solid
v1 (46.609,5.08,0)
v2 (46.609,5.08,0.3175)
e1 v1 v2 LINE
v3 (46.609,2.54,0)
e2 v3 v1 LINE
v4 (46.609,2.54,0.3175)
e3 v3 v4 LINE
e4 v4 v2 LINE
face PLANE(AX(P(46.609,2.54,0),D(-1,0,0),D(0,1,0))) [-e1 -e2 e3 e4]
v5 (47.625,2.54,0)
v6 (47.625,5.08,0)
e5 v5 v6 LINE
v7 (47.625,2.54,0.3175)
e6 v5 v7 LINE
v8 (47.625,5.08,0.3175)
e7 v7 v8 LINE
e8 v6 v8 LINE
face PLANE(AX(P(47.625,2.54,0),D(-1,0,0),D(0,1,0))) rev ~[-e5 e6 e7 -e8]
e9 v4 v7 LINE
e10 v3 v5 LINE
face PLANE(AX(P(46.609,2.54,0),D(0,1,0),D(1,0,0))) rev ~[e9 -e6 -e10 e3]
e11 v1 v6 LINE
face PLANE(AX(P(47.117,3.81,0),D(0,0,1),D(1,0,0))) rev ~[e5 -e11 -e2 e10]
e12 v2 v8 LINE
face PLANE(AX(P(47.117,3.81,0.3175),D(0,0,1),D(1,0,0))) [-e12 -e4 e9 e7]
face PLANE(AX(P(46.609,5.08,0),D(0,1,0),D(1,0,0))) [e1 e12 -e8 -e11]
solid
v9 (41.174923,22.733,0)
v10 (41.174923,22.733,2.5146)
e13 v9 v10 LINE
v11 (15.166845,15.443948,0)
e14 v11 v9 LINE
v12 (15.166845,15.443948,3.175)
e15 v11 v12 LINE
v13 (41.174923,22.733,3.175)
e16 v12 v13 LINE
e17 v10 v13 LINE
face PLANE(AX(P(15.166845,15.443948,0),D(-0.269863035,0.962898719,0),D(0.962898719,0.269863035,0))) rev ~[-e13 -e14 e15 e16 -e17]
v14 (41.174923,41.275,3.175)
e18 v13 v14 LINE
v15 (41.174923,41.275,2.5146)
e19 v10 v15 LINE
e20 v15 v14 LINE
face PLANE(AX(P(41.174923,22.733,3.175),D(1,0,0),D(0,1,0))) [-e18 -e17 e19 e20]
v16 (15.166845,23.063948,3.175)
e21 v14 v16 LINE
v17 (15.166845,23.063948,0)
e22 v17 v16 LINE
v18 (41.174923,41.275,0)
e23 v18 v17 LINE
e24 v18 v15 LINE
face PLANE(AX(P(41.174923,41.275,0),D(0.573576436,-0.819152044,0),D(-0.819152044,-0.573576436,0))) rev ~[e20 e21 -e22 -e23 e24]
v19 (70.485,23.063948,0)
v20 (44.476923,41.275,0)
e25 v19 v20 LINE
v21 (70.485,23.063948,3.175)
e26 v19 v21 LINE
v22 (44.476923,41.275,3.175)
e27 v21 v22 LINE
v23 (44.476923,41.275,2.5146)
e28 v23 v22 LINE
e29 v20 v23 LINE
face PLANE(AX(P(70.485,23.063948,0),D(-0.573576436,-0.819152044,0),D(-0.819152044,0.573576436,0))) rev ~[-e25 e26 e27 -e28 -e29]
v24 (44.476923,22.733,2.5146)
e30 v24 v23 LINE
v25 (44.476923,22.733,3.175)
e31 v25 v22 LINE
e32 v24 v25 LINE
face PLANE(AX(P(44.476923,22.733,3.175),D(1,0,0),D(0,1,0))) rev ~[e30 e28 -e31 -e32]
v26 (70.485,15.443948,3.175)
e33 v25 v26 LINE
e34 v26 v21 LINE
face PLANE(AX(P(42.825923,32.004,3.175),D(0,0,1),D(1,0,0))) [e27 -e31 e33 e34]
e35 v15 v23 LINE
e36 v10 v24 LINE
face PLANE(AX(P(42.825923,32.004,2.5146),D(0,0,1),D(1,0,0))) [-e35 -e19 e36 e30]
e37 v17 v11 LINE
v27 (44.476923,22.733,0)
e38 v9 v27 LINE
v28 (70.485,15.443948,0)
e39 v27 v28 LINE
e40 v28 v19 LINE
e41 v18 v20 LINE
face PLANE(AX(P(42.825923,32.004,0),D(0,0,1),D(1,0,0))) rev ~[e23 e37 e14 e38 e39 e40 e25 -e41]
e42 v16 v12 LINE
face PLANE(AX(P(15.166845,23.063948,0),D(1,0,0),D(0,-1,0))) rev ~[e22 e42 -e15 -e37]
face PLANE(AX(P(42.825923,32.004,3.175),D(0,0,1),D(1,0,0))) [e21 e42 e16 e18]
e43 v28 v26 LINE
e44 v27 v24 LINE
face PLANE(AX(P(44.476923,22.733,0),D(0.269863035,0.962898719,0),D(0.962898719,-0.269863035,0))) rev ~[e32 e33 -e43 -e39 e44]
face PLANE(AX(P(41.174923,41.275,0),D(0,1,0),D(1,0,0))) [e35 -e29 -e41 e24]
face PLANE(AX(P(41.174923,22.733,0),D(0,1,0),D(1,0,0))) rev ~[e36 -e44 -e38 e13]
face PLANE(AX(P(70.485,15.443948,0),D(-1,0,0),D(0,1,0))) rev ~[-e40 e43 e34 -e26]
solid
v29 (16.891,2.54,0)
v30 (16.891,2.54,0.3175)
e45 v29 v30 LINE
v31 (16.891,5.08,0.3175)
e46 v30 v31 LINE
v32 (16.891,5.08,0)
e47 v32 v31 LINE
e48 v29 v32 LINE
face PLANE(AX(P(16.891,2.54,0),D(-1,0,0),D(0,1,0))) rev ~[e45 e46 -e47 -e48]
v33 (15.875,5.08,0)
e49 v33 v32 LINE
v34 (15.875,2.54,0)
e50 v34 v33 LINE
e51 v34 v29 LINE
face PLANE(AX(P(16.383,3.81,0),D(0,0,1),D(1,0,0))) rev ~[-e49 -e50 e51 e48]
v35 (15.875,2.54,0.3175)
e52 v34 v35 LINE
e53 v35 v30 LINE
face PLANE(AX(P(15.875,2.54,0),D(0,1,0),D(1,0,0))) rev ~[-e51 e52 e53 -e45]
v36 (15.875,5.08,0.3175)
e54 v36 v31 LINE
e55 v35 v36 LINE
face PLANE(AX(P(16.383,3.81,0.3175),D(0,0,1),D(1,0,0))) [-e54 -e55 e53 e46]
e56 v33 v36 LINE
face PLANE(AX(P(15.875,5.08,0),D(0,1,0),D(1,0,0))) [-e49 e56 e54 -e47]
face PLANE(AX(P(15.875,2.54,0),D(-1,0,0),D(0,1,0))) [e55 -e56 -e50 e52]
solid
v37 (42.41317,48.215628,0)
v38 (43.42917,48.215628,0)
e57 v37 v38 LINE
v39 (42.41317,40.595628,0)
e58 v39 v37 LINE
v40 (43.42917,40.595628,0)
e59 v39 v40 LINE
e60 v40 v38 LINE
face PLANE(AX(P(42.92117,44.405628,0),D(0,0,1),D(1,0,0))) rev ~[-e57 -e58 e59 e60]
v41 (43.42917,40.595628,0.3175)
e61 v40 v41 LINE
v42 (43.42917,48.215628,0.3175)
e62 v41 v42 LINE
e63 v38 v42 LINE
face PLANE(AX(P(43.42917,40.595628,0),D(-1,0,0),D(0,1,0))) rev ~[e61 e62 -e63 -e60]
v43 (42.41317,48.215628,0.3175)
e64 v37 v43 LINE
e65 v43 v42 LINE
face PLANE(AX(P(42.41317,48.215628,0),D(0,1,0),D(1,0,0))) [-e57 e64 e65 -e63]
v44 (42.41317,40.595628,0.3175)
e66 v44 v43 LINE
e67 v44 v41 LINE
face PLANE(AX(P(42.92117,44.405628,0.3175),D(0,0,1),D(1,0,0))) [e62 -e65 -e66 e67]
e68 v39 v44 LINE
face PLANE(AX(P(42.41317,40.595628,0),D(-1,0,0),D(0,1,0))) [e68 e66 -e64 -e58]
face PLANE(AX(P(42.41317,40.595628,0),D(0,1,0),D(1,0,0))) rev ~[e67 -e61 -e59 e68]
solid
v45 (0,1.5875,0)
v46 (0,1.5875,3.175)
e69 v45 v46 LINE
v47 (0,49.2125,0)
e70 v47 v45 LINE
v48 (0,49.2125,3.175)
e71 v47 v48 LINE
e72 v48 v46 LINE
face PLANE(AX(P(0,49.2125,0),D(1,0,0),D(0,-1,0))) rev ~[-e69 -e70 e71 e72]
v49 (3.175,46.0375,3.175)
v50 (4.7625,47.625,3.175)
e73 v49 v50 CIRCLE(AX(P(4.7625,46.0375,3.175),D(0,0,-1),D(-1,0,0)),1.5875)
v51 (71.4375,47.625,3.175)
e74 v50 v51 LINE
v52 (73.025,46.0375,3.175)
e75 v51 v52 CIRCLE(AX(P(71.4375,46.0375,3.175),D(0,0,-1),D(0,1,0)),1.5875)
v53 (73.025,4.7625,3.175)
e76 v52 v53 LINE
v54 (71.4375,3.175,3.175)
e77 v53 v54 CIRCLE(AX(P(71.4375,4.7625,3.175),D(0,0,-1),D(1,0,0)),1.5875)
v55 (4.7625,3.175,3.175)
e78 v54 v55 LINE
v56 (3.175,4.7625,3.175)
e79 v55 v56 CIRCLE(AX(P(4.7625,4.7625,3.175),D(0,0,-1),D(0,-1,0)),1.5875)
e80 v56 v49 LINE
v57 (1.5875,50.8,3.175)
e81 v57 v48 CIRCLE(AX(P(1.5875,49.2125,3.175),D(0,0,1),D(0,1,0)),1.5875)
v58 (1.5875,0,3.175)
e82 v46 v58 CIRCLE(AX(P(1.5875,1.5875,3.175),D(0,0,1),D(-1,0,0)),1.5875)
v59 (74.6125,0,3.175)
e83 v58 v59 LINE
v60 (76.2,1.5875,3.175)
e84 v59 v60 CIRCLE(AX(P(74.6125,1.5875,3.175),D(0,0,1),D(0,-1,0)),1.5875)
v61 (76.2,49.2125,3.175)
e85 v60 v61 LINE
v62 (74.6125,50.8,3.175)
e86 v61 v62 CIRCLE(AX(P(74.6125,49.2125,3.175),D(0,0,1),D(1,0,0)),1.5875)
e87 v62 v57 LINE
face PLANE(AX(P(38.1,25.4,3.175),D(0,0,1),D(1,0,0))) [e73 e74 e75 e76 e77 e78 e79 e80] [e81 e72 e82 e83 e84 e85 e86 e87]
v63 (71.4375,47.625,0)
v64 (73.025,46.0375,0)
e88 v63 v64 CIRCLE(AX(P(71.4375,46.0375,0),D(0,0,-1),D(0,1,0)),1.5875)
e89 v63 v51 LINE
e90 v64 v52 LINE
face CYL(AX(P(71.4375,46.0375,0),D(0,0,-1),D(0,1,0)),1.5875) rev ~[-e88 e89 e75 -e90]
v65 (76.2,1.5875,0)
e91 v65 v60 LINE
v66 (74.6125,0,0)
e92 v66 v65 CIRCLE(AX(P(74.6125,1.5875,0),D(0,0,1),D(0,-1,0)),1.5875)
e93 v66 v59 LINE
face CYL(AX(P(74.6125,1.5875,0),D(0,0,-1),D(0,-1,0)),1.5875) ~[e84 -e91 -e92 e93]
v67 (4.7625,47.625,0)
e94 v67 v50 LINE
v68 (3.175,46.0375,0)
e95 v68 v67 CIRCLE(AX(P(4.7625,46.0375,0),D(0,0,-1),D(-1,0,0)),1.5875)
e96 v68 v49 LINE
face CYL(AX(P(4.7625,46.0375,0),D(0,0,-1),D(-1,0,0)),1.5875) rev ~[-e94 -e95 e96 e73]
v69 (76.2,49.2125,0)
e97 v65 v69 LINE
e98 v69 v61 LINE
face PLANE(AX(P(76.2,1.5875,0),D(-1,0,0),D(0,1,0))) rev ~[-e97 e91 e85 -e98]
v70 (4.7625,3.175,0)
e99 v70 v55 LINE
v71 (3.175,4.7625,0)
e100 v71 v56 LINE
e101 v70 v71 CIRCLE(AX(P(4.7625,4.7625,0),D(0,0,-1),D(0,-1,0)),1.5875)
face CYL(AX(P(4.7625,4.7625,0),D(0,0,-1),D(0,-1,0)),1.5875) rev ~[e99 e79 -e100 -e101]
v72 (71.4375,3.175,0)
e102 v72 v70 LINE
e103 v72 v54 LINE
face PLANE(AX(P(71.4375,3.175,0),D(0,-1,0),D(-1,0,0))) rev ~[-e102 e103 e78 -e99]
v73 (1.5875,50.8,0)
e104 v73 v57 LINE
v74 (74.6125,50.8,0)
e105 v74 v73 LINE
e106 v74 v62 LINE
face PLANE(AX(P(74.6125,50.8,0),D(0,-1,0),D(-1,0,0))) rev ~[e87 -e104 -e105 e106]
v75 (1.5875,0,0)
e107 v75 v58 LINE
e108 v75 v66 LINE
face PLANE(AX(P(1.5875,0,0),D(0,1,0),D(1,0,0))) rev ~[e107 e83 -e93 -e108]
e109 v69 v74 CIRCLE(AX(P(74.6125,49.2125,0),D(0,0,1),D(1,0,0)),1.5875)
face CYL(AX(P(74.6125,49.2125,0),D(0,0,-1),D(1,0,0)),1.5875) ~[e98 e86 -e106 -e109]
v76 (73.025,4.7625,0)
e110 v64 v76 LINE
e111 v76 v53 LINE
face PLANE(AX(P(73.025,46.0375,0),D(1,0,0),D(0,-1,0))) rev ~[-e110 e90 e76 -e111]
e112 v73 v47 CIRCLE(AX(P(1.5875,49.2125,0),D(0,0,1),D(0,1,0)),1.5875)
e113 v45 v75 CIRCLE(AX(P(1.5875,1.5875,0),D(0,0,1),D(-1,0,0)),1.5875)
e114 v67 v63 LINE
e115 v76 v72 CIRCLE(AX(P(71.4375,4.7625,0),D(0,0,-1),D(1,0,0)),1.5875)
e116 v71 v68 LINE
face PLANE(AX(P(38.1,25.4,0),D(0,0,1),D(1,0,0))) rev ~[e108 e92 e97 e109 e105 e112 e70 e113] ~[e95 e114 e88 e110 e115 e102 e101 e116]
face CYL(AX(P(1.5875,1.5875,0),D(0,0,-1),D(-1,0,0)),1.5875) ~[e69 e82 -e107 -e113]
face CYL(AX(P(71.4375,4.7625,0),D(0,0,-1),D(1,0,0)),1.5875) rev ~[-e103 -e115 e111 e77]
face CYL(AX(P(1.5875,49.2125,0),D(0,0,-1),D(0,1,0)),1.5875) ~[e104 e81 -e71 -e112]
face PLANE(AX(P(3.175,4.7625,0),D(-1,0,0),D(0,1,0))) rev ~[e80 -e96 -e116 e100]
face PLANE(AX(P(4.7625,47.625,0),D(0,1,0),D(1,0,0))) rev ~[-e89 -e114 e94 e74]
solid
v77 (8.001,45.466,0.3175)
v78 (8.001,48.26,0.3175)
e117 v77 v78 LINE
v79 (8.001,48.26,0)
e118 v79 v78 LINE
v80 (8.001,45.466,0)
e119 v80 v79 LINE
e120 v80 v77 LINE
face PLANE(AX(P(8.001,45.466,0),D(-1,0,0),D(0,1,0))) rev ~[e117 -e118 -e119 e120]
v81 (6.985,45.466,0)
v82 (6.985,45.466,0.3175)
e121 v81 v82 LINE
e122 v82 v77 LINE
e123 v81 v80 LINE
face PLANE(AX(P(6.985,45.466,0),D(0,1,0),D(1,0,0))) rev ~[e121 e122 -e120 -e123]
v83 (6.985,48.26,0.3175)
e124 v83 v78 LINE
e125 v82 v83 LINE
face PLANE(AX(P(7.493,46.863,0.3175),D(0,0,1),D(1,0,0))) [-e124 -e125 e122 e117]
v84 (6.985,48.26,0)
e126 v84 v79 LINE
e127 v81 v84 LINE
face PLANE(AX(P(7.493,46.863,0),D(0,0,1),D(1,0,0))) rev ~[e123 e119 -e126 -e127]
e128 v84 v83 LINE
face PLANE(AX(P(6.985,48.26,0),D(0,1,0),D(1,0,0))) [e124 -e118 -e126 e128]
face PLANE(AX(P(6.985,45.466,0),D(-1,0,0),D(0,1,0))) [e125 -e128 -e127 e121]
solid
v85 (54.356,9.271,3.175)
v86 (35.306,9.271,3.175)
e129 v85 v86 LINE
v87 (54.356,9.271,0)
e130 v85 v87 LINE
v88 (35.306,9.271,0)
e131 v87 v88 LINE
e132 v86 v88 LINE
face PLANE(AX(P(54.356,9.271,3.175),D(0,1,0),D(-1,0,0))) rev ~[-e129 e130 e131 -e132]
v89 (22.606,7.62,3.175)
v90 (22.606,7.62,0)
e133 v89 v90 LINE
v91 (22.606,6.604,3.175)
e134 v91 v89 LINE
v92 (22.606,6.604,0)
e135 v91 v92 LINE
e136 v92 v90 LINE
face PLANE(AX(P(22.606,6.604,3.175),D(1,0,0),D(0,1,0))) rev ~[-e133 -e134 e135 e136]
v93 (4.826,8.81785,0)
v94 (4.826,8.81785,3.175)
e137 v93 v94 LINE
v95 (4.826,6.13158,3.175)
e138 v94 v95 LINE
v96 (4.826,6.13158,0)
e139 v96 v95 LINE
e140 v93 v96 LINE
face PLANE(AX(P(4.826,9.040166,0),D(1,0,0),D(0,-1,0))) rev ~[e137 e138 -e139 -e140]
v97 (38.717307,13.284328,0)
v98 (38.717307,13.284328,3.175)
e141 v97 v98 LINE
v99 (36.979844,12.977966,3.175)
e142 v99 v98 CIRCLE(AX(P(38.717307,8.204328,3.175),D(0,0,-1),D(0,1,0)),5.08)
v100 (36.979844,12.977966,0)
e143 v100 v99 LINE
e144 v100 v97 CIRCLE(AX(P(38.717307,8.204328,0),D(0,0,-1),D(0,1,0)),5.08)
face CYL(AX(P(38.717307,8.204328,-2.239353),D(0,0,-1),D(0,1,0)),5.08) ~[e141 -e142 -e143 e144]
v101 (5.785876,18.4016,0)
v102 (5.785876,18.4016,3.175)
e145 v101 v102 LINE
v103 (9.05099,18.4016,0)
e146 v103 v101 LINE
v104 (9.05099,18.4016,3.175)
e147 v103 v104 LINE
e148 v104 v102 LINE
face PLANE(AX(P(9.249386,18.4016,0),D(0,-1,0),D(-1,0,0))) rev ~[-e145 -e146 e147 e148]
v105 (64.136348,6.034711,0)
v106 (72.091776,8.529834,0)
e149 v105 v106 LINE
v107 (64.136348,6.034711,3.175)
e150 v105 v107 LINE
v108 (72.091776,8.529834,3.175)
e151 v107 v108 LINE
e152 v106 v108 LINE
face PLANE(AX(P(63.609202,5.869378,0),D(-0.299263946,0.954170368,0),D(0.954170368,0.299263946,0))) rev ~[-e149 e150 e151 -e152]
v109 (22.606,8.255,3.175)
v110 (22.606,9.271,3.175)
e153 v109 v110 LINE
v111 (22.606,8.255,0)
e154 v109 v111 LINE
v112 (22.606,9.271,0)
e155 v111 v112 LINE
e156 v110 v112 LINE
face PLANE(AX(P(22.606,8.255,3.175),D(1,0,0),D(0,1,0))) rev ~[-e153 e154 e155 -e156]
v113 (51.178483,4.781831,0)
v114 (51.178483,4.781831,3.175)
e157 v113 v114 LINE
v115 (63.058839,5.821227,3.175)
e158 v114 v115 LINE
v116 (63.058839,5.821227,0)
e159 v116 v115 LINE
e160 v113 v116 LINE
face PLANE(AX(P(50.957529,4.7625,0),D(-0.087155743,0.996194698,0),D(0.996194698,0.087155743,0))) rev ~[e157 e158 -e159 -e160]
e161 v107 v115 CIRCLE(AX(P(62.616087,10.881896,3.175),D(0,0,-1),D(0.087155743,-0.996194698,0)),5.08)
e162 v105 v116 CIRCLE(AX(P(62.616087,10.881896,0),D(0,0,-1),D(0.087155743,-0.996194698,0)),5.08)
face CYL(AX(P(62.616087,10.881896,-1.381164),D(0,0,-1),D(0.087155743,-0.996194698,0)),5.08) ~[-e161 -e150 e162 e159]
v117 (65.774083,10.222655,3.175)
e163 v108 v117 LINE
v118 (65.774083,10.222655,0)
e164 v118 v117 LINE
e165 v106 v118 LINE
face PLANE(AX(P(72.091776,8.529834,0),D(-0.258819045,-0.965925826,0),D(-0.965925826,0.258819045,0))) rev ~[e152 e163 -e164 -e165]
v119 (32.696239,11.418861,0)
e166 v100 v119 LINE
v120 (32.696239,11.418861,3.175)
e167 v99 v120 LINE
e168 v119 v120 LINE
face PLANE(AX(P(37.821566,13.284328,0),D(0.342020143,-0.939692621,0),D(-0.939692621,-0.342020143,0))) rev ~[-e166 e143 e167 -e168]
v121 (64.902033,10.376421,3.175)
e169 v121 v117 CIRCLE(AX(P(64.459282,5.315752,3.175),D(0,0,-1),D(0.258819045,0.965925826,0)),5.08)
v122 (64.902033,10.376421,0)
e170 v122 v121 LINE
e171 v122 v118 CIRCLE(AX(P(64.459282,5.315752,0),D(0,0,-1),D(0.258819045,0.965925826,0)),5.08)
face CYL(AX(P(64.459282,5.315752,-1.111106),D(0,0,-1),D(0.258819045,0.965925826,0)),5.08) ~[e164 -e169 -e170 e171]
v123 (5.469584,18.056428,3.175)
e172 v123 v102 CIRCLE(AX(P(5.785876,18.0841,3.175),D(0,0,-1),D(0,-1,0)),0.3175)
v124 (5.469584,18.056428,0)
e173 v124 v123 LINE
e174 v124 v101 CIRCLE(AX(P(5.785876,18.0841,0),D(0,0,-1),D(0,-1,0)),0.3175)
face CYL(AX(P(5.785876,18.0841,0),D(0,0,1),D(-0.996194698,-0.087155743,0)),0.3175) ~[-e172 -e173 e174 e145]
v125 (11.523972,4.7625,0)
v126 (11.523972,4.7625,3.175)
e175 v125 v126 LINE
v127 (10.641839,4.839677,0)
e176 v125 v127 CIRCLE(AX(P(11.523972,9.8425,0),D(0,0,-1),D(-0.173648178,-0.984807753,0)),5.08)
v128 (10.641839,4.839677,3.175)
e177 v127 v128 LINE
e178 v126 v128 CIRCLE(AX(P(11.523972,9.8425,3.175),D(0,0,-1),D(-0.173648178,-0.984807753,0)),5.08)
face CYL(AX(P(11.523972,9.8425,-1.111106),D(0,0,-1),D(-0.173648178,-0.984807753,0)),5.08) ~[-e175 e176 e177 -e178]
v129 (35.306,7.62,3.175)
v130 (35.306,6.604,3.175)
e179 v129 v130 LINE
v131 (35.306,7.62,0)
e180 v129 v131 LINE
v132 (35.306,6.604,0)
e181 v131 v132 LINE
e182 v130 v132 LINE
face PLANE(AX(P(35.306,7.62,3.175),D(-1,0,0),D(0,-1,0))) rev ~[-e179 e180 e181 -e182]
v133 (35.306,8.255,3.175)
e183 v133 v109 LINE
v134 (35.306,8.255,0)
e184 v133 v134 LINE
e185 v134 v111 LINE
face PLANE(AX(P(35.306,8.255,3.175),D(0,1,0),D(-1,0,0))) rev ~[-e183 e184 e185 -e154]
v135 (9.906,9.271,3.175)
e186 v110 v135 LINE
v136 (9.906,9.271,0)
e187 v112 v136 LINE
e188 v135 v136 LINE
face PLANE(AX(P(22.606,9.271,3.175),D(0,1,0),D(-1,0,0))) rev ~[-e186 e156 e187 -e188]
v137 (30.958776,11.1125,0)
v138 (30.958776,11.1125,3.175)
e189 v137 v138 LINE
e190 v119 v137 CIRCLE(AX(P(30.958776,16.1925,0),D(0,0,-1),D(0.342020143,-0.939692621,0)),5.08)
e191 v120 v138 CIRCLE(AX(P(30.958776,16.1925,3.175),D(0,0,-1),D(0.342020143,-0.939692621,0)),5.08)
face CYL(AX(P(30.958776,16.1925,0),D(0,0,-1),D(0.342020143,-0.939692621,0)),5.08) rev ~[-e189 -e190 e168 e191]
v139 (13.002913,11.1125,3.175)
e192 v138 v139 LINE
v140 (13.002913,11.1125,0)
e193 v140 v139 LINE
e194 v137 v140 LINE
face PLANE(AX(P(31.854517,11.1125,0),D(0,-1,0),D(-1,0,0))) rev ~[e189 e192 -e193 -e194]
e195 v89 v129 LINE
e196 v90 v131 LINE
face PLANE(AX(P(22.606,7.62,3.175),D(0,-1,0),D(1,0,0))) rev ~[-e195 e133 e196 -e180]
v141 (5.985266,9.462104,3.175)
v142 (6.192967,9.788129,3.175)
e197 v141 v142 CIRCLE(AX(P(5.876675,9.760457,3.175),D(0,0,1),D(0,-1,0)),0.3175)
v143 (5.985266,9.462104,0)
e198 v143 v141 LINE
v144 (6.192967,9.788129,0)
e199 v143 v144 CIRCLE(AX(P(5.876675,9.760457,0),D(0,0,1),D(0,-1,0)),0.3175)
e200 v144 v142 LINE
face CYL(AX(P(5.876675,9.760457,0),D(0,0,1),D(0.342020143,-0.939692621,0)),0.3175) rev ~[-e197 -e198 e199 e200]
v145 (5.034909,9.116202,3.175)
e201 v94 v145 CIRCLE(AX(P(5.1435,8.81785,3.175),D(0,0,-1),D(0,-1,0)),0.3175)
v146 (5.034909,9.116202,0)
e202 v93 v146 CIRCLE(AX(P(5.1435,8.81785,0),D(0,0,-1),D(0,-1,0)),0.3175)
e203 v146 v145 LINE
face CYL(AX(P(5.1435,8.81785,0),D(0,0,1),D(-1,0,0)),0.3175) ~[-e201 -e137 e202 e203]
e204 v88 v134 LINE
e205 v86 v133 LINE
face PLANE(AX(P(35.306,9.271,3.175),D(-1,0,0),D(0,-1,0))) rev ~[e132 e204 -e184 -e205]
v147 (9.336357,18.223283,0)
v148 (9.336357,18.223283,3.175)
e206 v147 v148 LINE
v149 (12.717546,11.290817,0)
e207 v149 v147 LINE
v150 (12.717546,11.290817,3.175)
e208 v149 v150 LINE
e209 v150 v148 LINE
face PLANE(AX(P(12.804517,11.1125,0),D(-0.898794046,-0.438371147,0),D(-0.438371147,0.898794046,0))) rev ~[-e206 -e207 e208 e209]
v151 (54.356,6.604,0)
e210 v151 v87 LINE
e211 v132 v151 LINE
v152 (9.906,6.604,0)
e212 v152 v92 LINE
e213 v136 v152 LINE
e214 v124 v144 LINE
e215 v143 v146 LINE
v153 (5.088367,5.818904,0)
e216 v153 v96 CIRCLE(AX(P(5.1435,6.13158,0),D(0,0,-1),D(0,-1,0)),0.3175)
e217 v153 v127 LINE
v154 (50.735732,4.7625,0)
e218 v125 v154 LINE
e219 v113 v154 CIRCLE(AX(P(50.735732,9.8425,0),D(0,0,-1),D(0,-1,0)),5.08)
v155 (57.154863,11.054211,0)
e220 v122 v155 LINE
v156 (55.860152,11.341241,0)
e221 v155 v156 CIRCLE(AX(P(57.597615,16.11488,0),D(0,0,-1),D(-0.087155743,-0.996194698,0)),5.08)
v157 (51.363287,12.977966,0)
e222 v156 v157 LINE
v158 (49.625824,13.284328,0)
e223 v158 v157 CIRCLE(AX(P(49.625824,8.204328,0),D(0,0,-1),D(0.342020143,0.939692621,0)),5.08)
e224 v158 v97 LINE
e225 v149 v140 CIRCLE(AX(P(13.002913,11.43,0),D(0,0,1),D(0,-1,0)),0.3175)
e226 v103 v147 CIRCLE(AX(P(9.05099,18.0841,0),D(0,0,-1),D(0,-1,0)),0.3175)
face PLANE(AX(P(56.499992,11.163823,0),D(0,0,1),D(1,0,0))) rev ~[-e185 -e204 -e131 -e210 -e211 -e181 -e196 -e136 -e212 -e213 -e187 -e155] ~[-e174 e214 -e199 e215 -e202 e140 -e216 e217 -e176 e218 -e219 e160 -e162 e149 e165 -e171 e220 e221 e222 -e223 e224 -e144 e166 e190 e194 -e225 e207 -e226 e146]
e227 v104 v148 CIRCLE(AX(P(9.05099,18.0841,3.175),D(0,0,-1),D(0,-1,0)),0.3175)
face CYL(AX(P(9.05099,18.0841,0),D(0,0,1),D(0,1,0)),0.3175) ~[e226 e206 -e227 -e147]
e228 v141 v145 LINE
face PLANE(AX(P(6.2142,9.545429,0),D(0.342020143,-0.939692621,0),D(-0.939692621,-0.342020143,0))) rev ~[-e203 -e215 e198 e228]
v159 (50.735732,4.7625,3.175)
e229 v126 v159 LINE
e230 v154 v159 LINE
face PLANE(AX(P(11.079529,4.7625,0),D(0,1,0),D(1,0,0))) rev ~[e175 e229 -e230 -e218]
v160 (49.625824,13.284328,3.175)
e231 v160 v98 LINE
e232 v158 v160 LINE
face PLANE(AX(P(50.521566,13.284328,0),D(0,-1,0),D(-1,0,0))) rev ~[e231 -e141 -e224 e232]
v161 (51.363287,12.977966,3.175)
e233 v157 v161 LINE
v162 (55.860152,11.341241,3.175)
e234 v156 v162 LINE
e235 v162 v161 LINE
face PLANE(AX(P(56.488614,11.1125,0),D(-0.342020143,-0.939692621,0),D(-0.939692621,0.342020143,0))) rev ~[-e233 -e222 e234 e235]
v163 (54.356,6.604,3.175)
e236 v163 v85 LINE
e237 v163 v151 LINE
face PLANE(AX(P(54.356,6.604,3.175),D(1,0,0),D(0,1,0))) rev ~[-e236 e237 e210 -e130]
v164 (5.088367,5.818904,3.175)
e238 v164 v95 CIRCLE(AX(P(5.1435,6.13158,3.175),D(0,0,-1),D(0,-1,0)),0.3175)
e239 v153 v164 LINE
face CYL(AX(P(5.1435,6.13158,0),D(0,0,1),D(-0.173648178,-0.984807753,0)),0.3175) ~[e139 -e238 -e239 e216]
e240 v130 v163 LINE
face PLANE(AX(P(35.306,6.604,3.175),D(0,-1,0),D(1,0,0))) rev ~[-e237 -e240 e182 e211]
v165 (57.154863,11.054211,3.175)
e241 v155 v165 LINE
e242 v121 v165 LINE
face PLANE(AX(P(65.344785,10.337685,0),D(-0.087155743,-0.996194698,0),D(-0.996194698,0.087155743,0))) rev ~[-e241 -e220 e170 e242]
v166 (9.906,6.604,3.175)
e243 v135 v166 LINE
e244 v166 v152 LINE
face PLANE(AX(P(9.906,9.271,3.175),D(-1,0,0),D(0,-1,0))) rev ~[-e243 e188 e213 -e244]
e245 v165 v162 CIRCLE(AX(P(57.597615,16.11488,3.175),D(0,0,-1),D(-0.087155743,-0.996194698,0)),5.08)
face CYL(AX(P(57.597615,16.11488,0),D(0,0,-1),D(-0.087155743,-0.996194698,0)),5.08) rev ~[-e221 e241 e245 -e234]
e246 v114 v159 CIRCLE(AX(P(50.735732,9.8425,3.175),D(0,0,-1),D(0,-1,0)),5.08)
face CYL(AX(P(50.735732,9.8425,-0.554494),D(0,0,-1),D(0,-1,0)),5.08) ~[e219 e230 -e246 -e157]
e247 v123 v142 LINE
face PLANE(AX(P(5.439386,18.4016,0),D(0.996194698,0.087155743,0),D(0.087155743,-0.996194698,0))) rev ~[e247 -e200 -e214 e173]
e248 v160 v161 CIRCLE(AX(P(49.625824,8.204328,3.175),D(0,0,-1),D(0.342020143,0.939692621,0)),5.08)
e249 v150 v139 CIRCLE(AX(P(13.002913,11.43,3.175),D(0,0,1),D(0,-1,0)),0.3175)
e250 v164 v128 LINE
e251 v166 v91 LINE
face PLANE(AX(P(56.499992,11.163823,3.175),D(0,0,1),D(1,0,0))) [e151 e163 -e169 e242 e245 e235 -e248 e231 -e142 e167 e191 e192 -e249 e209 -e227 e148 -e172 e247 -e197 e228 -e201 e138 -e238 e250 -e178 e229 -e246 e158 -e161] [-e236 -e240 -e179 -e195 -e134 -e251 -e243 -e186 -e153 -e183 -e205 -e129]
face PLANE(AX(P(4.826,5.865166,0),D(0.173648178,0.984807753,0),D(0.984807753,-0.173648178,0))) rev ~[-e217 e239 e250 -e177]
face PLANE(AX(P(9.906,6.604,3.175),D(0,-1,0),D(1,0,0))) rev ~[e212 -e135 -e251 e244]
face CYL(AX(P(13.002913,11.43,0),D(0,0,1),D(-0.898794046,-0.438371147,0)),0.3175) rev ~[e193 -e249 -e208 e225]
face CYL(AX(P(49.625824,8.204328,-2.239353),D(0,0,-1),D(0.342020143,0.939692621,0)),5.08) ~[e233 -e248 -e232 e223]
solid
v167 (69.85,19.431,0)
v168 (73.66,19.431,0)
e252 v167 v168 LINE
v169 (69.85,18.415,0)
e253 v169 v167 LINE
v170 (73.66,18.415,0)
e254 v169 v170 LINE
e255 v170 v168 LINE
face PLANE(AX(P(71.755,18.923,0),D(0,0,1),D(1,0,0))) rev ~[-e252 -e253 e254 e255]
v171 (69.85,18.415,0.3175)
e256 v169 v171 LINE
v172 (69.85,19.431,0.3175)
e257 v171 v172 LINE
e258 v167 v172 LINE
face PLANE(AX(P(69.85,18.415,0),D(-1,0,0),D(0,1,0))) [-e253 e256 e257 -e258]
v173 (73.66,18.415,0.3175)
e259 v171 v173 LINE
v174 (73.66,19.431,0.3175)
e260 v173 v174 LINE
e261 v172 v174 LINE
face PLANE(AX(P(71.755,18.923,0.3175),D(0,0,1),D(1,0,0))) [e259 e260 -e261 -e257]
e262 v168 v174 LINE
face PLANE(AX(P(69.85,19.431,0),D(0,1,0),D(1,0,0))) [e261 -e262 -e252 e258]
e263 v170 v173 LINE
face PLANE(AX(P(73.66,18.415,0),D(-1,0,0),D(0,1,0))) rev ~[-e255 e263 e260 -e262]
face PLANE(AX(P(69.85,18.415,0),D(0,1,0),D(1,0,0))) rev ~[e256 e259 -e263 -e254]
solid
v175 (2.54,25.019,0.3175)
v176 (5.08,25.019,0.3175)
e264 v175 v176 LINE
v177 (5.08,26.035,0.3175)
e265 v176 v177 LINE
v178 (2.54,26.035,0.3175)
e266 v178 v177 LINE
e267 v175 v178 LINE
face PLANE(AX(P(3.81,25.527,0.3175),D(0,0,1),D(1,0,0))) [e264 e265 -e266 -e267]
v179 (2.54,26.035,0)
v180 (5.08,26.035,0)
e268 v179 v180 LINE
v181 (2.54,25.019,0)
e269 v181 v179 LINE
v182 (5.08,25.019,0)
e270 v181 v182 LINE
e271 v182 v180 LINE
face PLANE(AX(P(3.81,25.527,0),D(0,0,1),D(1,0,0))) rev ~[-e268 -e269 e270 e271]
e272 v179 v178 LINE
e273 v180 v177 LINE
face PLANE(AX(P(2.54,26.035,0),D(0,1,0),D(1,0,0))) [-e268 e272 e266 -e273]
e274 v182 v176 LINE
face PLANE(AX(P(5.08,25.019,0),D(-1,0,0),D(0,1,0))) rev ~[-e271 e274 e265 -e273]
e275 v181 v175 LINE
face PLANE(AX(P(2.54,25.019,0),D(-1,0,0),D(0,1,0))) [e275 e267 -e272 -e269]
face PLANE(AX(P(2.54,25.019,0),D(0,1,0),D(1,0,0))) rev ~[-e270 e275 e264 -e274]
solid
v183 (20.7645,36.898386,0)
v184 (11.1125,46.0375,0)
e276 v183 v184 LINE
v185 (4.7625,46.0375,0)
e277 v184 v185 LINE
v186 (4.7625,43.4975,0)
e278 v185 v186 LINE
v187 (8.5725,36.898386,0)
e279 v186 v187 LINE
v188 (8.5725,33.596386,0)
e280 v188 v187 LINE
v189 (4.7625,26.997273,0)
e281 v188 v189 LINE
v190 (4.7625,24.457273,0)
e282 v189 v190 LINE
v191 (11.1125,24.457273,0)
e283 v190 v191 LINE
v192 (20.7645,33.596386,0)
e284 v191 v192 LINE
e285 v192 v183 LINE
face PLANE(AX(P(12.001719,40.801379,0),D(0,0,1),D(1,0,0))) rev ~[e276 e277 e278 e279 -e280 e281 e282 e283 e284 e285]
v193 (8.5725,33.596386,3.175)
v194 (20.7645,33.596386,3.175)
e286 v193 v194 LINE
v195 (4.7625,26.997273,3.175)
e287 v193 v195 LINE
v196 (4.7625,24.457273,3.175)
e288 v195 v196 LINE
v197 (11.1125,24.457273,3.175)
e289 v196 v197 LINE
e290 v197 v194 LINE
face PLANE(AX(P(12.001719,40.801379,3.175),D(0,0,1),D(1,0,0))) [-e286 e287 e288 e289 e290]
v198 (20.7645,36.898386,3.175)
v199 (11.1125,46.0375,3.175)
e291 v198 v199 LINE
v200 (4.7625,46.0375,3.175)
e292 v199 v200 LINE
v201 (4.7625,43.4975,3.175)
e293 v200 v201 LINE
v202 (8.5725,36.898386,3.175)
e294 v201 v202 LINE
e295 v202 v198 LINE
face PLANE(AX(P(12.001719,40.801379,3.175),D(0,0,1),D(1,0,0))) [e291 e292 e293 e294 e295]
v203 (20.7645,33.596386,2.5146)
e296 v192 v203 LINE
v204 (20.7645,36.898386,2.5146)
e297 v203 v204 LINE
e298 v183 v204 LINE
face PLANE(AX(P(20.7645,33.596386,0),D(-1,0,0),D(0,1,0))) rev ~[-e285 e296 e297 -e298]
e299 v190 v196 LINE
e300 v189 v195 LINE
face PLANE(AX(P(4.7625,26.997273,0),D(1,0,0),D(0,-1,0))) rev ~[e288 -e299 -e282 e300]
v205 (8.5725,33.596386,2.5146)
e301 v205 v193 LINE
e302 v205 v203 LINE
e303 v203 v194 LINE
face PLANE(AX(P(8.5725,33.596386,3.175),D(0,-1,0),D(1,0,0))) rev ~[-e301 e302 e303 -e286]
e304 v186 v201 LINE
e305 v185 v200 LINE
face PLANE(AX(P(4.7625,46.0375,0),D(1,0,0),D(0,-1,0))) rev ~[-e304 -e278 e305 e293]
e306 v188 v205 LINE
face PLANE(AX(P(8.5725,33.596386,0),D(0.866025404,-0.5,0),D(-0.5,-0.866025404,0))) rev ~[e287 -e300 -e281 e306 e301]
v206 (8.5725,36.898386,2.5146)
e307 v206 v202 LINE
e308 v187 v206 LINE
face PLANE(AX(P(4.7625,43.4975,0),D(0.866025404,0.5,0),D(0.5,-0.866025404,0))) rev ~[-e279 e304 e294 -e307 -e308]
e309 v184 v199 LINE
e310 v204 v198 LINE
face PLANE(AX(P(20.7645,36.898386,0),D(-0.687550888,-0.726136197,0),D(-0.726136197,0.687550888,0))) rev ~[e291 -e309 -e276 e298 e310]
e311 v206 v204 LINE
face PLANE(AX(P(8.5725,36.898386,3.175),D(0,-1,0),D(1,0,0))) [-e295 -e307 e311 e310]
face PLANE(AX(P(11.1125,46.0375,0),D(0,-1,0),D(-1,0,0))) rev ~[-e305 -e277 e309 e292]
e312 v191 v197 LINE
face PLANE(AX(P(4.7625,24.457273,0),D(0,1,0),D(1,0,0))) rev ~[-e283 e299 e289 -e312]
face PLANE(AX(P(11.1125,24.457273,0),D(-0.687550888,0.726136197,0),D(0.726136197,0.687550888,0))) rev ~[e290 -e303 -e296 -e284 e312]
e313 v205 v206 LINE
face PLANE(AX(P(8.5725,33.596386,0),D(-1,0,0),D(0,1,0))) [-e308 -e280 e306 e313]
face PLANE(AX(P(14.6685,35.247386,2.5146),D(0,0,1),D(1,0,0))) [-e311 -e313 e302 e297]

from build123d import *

# Parameters (mm, degrees)
F1_DEPTH    = 3.175
F3_DEPTH    = 3.175
F4_T1_DEPTH = 3.175
F4_T3_DEPTH = 5.3972120536
F4_T5_DEPTH = 7.65370531
F4_T7_DEPTH = 5.937328176
F4_T9_DEPTH = 4.2839879499
F5_R        = 0.3175
F7_DEPTH    = 25.4
F8_W        = 12.192
F8_H        = 3.302
F9_DEPTH    = 3.175
F10_W       = 12.192
F10_H       = 3.302
F11_DEPTH   = 0.6604
F12_W       = 3.302
F12_H       = 18.542
F13_DEPTH   = 3.175
F14_W       = 3.302
F14_H       = 18.542
F15_DEPTH   = 0.6604
F16_W       = 3.81
F16_H       = 1.016
F17_DEPTH   = 0.3175
F16_W_2     = 1.016
F16_H_2     = 7.62
F16_H_3     = 2.54
F16_W_3     = 2.54
F16_H_4     = 2.794


# Not quite as in the source:
# - a fillet or chamfer that OpenCascade refuses, or shapes differently, is made with other operations: its cross-section is extruded or revolved along the edge and cut away or added


with BuildPart() as f1:
    # F0 (on Top) → F1 (new body)
    with BuildSketch(Plane.XY):
        with BuildLine():
            ThreePointArc((0, 1.5875), (0.4649679849, 0.4649679849), (1.5875, 0))
            Line((1.5875, 0), (74.6125, 0))
            ThreePointArc((74.6125, 0), (75.7350320151, 0.4649679849), (76.2, 1.5875))
            Line((76.2, 1.5875), (76.2, 49.2125))
            ThreePointArc((76.2, 49.2125), (75.7350320151, 50.3350320151), (74.6125, 50.8))
            Line((74.6125, 50.8), (1.5875, 50.8))
            ThreePointArc((1.5875, 50.8), (0.4649679849, 50.3350320151), (0, 49.2125))
            Line((0, 49.2125), (0, 1.5875))
        make_face()
        with BuildLine():
            Line((73.025, 46.0375), (73.025, 4.7625))
            ThreePointArc((73.025, 4.7625), (72.5600320151, 3.6399679849), (71.4375, 3.175))
            Line((71.4375, 3.175), (4.7625, 3.175))
            ThreePointArc((4.7625, 3.175), (3.6399679849, 3.6399679849), (3.175, 4.7625))
            Line((3.175, 4.7625), (3.175, 46.0375))
            ThreePointArc((3.175, 46.0375), (3.6399679849, 47.1600320151), (4.7625, 47.625))
            Line((4.7625, 47.625), (71.4375, 47.625))
            ThreePointArc((71.4375, 47.625), (72.5600320151, 47.1600320151), (73.025, 46.0375))
        make_face(mode=Mode.SUBTRACT)
    extrude(amount=F1_DEPTH)


with BuildPart() as f3:
    # F2 (on Top) → F3 (new body)
    with BuildSketch(Plane.XY):
        Polygon((4.826, 5.8651659282), (11.0795292316, 4.7625), (50.9575292316, 4.7625), (63.6092018974, 5.8693779329), (72.0917764651, 8.5298344169), (65.3447845685, 10.337685447), (56.4886137024, 11.1125), (50.5215655604, 13.2843279101), (37.8215655604, 13.2843279101), (31.8545174184, 11.1125), (12.8045174184, 11.1125), (9.2493856396, 18.4016003435), (5.4393856396, 18.4016003435), (6.2142001926, 9.5454294775), (4.826, 9.0401659282), align=None)
    extrude(amount=F3_DEPTH)

    # F4: fillet of radius 5.08 on 8 edges, made by hand

    # F4_s2 → F4_t1 (join)
    with BuildSketch(Plane.XY):
        with BuildLine():
            ThreePointArc((57.1548634245, 11.0542107022), (56.4981013588, 11.1552960524), (55.8601522695, 11.341241255))
            Line((55.8601522695, 11.341241255), (56.4886137024, 11.1125))
            Line((56.4886137024, 11.1125), (57.1548634245, 11.0542107022))
        make_face()
        with BuildLine():
            ThreePointArc((32.6962386845, 11.4188614864), (31.840909099, 11.1896766147), (30.9587763564, 11.1125))
            Line((30.9587763564, 11.1125), (31.8545174184, 11.1125))
            Line((31.8545174184, 11.1125), (32.6962386845, 11.4188614864))
        make_face()
    extrude(amount=F4_T1_DEPTH)

    # F4_s4 → F4_t3 (cut)
    with BuildSketch(Plane.XY.offset(-1.1111060268)):
        with BuildLine():
            ThreePointArc((65.7740829713, 10.2226552866), (65.3414149647, 10.3185754744), (64.9020333953, 10.3764211554))
            Line((64.9020333953, 10.3764211554), (65.3447845685, 10.337685447))
            Line((65.3447845685, 10.337685447), (65.7740829713, 10.2226552866))
        make_face()
        with BuildLine():
            ThreePointArc((10.6418388998, 4.8396766147), (11.0812204692, 4.7818309337), (11.5239716423, 4.7625))
            Line((11.5239716423, 4.7625), (11.0795292316, 4.7625))
            Line((11.0795292316, 4.7625), (10.6418388998, 4.8396766147))
        make_face()
    extrude(amount=F4_T3_DEPTH, mode=Mode.SUBTRACT)

    # F4_s6 → F4_t5 (cut)
    with BuildSketch(Plane.XY.offset(-2.239352655)):
        with BuildLine():
            ThreePointArc((51.3632868265, 12.9779664237), (50.507957241, 13.2071512954), (49.6258244984, 13.2843279101))
            Line((49.6258244984, 13.2843279101), (50.5215655604, 13.2843279101))
            Line((50.5215655604, 13.2843279101), (51.3632868265, 12.9779664237))
        make_face()
        with BuildLine():
            ThreePointArc((38.7173066224, 13.2843279101), (37.8351738799, 13.2071512954), (36.9798442943, 12.9779664237))
            Line((36.9798442943, 12.9779664237), (37.8215655604, 13.2843279101))
            Line((37.8215655604, 13.2843279101), (38.7173066224, 13.2843279101))
        make_face()
    extrude(amount=F4_T5_DEPTH, mode=Mode.SUBTRACT)

    # F4_s8 → F4_t7 (cut)
    with BuildSketch(Plane.XY.offset(-1.381164088)):
        with BuildLine():
            ThreePointArc((63.0588385607, 5.8212273801), (63.6033805865, 5.8987596693), (64.1363482356, 6.0347109792))
            Line((64.1363482356, 6.0347109792), (63.6092018974, 5.8693779329))
            Line((63.6092018974, 5.8693779329), (63.0588385607, 5.8212273801))
        make_face()
    extrude(amount=F4_T7_DEPTH, mode=Mode.SUBTRACT)

    # F4_s10 → F4_t9 (cut)
    with BuildSketch(Plane.XY.offset(-0.5544939749)):
        with BuildLine():
            ThreePointArc((50.7357316417, 4.7625), (50.9573181295, 4.7673350344), (51.1784828148, 4.7818309337))
            Line((51.1784828148, 4.7818309337), (50.9575292316, 4.7625))
            Line((50.9575292316, 4.7625), (50.7357316417, 4.7625))
        make_face()
    extrude(amount=F4_T9_DEPTH, mode=Mode.SUBTRACT)

    # F5
    f5_edges = [f3.edges().sort_by_distance(p)[0] for p in [
        (4.826, 5.865166, 1.5875),
        (4.826, 9.040166, 1.5875),
        (6.2142, 9.545429, 1.5875),
        (5.439386, 18.4016, 1.5875),
        (9.249386, 18.4016, 1.5875),
        (12.804517, 11.1125, 1.5875),
    ]]
    fillet(f5_edges, radius=F5_R)

    # F6 (on face) → F7 (cut)
    with BuildSketch(Plane.XY.offset(3.175)):
        Polygon((22.606, 9.271), (9.906, 9.271), (9.906, 6.604), (22.606, 6.604), (22.606, 7.62), (35.306, 7.62), (35.306, 6.604), (54.356, 6.604), (54.356, 9.271), (35.306, 9.271), (35.306, 8.255), (22.606, 8.255), align=None)
    extrude(amount=-F7_DEPTH, mode=Mode.SUBTRACT)


with BuildPart() as f9:
    # F8 (on Top) → F9 (new body)
    with BuildSketch(Plane.XY):
        Polygon((4.7625, 43.4975), (8.5725, 36.8983864232), (20.7645, 36.8983864232), (11.1125, 46.0375), (4.7625, 46.0375), align=None)
        with Locations((14.6685, 35.2473864232)):
            Rectangle(F8_W, F8_H)
        Polygon((20.7645, 33.5963864232), (8.5725, 33.5963864232), (4.7625, 26.9972728463), (4.7625, 24.4572728463), (11.1125, 24.4572728463), align=None)
    extrude(amount=F9_DEPTH)

    # F10 (on face) → F11 (cut)
    with BuildSketch(Plane.XY.offset(3.175)):
        with Locations((14.6685, 35.2473864232)):
            Rectangle(F10_W, F10_H)
    extrude(amount=-F11_DEPTH, mode=Mode.SUBTRACT)


with BuildPart() as f13:
    # F12 (on Top) → F13 (new body)
    with BuildSketch(Plane.XY):
        with Locations((42.8259225938, 32.004)):
            Rectangle(F12_W, F12_H)
        Polygon((41.1749225938, 22.733), (41.1749225938, 41.275), (15.1668451876, 23.0639481459), (15.1668451876, 15.4439481459), align=None)
        Polygon((70.485, 23.0639481459), (44.4769225938, 41.275), (44.4769225938, 22.733), (70.485, 15.4439481459), align=None)
    extrude(amount=F13_DEPTH)

    # F14 (on face) → F15 (cut)
    with BuildSketch(Plane.XY.offset(3.175)):
        with Locations((42.8259225938, 32.004)):
            Rectangle(F14_W, F14_H)
    extrude(amount=-F15_DEPTH, mode=Mode.SUBTRACT)


with BuildPart() as f17:
    # F16 (on Top) → F17 (new body)
    with BuildSketch(Plane.XY):
        with Locations((71.755, 18.923)):
            Rectangle(F16_W, F16_H)
    extrude(amount=F17_DEPTH)


with BuildPart() as f17b:
    # F16 (on Top) → F17, piece 2 (new body)
    with BuildSketch(Plane.XY):
        with Locations((42.9211696643, 44.4056276325)):
            Rectangle(F16_W_2, F16_H_2)
    extrude(amount=F17_DEPTH)


with BuildPart() as f17c:
    # F16 (on Top) → F17, piece 3 (new body)
    with BuildSketch(Plane.XY):
        with Locations((47.117, 3.81)):
            Rectangle(F16_W_2, F16_H_3)
    extrude(amount=F17_DEPTH)


with BuildPart() as f17d:
    # F16 (on Top) → F17, piece 4 (new body)
    with BuildSketch(Plane.XY):
        with Locations((16.383, 3.81)):
            Rectangle(F16_W_2, F16_H_3)
    extrude(amount=F17_DEPTH)


with BuildPart() as f17e:
    # F16 (on Top) → F17, piece 5 (new body)
    with BuildSketch(Plane.XY):
        with Locations((3.81, 25.527)):
            Rectangle(F16_W_3, F16_H)
    extrude(amount=F17_DEPTH)


with BuildPart() as f17f:
    # F16 (on Top) → F17, piece 6 (new body)
    with BuildSketch(Plane.XY):
        with Locations((7.493, 46.863)):
            Rectangle(F16_W_2, F16_H_4)
    extrude(amount=F17_DEPTH)


solid = Compound([f1.part, f3.part, f9.part, f13.part, f17.part, f17b.part, f17c.part, f17d.part, f17e.part, f17f.part])
